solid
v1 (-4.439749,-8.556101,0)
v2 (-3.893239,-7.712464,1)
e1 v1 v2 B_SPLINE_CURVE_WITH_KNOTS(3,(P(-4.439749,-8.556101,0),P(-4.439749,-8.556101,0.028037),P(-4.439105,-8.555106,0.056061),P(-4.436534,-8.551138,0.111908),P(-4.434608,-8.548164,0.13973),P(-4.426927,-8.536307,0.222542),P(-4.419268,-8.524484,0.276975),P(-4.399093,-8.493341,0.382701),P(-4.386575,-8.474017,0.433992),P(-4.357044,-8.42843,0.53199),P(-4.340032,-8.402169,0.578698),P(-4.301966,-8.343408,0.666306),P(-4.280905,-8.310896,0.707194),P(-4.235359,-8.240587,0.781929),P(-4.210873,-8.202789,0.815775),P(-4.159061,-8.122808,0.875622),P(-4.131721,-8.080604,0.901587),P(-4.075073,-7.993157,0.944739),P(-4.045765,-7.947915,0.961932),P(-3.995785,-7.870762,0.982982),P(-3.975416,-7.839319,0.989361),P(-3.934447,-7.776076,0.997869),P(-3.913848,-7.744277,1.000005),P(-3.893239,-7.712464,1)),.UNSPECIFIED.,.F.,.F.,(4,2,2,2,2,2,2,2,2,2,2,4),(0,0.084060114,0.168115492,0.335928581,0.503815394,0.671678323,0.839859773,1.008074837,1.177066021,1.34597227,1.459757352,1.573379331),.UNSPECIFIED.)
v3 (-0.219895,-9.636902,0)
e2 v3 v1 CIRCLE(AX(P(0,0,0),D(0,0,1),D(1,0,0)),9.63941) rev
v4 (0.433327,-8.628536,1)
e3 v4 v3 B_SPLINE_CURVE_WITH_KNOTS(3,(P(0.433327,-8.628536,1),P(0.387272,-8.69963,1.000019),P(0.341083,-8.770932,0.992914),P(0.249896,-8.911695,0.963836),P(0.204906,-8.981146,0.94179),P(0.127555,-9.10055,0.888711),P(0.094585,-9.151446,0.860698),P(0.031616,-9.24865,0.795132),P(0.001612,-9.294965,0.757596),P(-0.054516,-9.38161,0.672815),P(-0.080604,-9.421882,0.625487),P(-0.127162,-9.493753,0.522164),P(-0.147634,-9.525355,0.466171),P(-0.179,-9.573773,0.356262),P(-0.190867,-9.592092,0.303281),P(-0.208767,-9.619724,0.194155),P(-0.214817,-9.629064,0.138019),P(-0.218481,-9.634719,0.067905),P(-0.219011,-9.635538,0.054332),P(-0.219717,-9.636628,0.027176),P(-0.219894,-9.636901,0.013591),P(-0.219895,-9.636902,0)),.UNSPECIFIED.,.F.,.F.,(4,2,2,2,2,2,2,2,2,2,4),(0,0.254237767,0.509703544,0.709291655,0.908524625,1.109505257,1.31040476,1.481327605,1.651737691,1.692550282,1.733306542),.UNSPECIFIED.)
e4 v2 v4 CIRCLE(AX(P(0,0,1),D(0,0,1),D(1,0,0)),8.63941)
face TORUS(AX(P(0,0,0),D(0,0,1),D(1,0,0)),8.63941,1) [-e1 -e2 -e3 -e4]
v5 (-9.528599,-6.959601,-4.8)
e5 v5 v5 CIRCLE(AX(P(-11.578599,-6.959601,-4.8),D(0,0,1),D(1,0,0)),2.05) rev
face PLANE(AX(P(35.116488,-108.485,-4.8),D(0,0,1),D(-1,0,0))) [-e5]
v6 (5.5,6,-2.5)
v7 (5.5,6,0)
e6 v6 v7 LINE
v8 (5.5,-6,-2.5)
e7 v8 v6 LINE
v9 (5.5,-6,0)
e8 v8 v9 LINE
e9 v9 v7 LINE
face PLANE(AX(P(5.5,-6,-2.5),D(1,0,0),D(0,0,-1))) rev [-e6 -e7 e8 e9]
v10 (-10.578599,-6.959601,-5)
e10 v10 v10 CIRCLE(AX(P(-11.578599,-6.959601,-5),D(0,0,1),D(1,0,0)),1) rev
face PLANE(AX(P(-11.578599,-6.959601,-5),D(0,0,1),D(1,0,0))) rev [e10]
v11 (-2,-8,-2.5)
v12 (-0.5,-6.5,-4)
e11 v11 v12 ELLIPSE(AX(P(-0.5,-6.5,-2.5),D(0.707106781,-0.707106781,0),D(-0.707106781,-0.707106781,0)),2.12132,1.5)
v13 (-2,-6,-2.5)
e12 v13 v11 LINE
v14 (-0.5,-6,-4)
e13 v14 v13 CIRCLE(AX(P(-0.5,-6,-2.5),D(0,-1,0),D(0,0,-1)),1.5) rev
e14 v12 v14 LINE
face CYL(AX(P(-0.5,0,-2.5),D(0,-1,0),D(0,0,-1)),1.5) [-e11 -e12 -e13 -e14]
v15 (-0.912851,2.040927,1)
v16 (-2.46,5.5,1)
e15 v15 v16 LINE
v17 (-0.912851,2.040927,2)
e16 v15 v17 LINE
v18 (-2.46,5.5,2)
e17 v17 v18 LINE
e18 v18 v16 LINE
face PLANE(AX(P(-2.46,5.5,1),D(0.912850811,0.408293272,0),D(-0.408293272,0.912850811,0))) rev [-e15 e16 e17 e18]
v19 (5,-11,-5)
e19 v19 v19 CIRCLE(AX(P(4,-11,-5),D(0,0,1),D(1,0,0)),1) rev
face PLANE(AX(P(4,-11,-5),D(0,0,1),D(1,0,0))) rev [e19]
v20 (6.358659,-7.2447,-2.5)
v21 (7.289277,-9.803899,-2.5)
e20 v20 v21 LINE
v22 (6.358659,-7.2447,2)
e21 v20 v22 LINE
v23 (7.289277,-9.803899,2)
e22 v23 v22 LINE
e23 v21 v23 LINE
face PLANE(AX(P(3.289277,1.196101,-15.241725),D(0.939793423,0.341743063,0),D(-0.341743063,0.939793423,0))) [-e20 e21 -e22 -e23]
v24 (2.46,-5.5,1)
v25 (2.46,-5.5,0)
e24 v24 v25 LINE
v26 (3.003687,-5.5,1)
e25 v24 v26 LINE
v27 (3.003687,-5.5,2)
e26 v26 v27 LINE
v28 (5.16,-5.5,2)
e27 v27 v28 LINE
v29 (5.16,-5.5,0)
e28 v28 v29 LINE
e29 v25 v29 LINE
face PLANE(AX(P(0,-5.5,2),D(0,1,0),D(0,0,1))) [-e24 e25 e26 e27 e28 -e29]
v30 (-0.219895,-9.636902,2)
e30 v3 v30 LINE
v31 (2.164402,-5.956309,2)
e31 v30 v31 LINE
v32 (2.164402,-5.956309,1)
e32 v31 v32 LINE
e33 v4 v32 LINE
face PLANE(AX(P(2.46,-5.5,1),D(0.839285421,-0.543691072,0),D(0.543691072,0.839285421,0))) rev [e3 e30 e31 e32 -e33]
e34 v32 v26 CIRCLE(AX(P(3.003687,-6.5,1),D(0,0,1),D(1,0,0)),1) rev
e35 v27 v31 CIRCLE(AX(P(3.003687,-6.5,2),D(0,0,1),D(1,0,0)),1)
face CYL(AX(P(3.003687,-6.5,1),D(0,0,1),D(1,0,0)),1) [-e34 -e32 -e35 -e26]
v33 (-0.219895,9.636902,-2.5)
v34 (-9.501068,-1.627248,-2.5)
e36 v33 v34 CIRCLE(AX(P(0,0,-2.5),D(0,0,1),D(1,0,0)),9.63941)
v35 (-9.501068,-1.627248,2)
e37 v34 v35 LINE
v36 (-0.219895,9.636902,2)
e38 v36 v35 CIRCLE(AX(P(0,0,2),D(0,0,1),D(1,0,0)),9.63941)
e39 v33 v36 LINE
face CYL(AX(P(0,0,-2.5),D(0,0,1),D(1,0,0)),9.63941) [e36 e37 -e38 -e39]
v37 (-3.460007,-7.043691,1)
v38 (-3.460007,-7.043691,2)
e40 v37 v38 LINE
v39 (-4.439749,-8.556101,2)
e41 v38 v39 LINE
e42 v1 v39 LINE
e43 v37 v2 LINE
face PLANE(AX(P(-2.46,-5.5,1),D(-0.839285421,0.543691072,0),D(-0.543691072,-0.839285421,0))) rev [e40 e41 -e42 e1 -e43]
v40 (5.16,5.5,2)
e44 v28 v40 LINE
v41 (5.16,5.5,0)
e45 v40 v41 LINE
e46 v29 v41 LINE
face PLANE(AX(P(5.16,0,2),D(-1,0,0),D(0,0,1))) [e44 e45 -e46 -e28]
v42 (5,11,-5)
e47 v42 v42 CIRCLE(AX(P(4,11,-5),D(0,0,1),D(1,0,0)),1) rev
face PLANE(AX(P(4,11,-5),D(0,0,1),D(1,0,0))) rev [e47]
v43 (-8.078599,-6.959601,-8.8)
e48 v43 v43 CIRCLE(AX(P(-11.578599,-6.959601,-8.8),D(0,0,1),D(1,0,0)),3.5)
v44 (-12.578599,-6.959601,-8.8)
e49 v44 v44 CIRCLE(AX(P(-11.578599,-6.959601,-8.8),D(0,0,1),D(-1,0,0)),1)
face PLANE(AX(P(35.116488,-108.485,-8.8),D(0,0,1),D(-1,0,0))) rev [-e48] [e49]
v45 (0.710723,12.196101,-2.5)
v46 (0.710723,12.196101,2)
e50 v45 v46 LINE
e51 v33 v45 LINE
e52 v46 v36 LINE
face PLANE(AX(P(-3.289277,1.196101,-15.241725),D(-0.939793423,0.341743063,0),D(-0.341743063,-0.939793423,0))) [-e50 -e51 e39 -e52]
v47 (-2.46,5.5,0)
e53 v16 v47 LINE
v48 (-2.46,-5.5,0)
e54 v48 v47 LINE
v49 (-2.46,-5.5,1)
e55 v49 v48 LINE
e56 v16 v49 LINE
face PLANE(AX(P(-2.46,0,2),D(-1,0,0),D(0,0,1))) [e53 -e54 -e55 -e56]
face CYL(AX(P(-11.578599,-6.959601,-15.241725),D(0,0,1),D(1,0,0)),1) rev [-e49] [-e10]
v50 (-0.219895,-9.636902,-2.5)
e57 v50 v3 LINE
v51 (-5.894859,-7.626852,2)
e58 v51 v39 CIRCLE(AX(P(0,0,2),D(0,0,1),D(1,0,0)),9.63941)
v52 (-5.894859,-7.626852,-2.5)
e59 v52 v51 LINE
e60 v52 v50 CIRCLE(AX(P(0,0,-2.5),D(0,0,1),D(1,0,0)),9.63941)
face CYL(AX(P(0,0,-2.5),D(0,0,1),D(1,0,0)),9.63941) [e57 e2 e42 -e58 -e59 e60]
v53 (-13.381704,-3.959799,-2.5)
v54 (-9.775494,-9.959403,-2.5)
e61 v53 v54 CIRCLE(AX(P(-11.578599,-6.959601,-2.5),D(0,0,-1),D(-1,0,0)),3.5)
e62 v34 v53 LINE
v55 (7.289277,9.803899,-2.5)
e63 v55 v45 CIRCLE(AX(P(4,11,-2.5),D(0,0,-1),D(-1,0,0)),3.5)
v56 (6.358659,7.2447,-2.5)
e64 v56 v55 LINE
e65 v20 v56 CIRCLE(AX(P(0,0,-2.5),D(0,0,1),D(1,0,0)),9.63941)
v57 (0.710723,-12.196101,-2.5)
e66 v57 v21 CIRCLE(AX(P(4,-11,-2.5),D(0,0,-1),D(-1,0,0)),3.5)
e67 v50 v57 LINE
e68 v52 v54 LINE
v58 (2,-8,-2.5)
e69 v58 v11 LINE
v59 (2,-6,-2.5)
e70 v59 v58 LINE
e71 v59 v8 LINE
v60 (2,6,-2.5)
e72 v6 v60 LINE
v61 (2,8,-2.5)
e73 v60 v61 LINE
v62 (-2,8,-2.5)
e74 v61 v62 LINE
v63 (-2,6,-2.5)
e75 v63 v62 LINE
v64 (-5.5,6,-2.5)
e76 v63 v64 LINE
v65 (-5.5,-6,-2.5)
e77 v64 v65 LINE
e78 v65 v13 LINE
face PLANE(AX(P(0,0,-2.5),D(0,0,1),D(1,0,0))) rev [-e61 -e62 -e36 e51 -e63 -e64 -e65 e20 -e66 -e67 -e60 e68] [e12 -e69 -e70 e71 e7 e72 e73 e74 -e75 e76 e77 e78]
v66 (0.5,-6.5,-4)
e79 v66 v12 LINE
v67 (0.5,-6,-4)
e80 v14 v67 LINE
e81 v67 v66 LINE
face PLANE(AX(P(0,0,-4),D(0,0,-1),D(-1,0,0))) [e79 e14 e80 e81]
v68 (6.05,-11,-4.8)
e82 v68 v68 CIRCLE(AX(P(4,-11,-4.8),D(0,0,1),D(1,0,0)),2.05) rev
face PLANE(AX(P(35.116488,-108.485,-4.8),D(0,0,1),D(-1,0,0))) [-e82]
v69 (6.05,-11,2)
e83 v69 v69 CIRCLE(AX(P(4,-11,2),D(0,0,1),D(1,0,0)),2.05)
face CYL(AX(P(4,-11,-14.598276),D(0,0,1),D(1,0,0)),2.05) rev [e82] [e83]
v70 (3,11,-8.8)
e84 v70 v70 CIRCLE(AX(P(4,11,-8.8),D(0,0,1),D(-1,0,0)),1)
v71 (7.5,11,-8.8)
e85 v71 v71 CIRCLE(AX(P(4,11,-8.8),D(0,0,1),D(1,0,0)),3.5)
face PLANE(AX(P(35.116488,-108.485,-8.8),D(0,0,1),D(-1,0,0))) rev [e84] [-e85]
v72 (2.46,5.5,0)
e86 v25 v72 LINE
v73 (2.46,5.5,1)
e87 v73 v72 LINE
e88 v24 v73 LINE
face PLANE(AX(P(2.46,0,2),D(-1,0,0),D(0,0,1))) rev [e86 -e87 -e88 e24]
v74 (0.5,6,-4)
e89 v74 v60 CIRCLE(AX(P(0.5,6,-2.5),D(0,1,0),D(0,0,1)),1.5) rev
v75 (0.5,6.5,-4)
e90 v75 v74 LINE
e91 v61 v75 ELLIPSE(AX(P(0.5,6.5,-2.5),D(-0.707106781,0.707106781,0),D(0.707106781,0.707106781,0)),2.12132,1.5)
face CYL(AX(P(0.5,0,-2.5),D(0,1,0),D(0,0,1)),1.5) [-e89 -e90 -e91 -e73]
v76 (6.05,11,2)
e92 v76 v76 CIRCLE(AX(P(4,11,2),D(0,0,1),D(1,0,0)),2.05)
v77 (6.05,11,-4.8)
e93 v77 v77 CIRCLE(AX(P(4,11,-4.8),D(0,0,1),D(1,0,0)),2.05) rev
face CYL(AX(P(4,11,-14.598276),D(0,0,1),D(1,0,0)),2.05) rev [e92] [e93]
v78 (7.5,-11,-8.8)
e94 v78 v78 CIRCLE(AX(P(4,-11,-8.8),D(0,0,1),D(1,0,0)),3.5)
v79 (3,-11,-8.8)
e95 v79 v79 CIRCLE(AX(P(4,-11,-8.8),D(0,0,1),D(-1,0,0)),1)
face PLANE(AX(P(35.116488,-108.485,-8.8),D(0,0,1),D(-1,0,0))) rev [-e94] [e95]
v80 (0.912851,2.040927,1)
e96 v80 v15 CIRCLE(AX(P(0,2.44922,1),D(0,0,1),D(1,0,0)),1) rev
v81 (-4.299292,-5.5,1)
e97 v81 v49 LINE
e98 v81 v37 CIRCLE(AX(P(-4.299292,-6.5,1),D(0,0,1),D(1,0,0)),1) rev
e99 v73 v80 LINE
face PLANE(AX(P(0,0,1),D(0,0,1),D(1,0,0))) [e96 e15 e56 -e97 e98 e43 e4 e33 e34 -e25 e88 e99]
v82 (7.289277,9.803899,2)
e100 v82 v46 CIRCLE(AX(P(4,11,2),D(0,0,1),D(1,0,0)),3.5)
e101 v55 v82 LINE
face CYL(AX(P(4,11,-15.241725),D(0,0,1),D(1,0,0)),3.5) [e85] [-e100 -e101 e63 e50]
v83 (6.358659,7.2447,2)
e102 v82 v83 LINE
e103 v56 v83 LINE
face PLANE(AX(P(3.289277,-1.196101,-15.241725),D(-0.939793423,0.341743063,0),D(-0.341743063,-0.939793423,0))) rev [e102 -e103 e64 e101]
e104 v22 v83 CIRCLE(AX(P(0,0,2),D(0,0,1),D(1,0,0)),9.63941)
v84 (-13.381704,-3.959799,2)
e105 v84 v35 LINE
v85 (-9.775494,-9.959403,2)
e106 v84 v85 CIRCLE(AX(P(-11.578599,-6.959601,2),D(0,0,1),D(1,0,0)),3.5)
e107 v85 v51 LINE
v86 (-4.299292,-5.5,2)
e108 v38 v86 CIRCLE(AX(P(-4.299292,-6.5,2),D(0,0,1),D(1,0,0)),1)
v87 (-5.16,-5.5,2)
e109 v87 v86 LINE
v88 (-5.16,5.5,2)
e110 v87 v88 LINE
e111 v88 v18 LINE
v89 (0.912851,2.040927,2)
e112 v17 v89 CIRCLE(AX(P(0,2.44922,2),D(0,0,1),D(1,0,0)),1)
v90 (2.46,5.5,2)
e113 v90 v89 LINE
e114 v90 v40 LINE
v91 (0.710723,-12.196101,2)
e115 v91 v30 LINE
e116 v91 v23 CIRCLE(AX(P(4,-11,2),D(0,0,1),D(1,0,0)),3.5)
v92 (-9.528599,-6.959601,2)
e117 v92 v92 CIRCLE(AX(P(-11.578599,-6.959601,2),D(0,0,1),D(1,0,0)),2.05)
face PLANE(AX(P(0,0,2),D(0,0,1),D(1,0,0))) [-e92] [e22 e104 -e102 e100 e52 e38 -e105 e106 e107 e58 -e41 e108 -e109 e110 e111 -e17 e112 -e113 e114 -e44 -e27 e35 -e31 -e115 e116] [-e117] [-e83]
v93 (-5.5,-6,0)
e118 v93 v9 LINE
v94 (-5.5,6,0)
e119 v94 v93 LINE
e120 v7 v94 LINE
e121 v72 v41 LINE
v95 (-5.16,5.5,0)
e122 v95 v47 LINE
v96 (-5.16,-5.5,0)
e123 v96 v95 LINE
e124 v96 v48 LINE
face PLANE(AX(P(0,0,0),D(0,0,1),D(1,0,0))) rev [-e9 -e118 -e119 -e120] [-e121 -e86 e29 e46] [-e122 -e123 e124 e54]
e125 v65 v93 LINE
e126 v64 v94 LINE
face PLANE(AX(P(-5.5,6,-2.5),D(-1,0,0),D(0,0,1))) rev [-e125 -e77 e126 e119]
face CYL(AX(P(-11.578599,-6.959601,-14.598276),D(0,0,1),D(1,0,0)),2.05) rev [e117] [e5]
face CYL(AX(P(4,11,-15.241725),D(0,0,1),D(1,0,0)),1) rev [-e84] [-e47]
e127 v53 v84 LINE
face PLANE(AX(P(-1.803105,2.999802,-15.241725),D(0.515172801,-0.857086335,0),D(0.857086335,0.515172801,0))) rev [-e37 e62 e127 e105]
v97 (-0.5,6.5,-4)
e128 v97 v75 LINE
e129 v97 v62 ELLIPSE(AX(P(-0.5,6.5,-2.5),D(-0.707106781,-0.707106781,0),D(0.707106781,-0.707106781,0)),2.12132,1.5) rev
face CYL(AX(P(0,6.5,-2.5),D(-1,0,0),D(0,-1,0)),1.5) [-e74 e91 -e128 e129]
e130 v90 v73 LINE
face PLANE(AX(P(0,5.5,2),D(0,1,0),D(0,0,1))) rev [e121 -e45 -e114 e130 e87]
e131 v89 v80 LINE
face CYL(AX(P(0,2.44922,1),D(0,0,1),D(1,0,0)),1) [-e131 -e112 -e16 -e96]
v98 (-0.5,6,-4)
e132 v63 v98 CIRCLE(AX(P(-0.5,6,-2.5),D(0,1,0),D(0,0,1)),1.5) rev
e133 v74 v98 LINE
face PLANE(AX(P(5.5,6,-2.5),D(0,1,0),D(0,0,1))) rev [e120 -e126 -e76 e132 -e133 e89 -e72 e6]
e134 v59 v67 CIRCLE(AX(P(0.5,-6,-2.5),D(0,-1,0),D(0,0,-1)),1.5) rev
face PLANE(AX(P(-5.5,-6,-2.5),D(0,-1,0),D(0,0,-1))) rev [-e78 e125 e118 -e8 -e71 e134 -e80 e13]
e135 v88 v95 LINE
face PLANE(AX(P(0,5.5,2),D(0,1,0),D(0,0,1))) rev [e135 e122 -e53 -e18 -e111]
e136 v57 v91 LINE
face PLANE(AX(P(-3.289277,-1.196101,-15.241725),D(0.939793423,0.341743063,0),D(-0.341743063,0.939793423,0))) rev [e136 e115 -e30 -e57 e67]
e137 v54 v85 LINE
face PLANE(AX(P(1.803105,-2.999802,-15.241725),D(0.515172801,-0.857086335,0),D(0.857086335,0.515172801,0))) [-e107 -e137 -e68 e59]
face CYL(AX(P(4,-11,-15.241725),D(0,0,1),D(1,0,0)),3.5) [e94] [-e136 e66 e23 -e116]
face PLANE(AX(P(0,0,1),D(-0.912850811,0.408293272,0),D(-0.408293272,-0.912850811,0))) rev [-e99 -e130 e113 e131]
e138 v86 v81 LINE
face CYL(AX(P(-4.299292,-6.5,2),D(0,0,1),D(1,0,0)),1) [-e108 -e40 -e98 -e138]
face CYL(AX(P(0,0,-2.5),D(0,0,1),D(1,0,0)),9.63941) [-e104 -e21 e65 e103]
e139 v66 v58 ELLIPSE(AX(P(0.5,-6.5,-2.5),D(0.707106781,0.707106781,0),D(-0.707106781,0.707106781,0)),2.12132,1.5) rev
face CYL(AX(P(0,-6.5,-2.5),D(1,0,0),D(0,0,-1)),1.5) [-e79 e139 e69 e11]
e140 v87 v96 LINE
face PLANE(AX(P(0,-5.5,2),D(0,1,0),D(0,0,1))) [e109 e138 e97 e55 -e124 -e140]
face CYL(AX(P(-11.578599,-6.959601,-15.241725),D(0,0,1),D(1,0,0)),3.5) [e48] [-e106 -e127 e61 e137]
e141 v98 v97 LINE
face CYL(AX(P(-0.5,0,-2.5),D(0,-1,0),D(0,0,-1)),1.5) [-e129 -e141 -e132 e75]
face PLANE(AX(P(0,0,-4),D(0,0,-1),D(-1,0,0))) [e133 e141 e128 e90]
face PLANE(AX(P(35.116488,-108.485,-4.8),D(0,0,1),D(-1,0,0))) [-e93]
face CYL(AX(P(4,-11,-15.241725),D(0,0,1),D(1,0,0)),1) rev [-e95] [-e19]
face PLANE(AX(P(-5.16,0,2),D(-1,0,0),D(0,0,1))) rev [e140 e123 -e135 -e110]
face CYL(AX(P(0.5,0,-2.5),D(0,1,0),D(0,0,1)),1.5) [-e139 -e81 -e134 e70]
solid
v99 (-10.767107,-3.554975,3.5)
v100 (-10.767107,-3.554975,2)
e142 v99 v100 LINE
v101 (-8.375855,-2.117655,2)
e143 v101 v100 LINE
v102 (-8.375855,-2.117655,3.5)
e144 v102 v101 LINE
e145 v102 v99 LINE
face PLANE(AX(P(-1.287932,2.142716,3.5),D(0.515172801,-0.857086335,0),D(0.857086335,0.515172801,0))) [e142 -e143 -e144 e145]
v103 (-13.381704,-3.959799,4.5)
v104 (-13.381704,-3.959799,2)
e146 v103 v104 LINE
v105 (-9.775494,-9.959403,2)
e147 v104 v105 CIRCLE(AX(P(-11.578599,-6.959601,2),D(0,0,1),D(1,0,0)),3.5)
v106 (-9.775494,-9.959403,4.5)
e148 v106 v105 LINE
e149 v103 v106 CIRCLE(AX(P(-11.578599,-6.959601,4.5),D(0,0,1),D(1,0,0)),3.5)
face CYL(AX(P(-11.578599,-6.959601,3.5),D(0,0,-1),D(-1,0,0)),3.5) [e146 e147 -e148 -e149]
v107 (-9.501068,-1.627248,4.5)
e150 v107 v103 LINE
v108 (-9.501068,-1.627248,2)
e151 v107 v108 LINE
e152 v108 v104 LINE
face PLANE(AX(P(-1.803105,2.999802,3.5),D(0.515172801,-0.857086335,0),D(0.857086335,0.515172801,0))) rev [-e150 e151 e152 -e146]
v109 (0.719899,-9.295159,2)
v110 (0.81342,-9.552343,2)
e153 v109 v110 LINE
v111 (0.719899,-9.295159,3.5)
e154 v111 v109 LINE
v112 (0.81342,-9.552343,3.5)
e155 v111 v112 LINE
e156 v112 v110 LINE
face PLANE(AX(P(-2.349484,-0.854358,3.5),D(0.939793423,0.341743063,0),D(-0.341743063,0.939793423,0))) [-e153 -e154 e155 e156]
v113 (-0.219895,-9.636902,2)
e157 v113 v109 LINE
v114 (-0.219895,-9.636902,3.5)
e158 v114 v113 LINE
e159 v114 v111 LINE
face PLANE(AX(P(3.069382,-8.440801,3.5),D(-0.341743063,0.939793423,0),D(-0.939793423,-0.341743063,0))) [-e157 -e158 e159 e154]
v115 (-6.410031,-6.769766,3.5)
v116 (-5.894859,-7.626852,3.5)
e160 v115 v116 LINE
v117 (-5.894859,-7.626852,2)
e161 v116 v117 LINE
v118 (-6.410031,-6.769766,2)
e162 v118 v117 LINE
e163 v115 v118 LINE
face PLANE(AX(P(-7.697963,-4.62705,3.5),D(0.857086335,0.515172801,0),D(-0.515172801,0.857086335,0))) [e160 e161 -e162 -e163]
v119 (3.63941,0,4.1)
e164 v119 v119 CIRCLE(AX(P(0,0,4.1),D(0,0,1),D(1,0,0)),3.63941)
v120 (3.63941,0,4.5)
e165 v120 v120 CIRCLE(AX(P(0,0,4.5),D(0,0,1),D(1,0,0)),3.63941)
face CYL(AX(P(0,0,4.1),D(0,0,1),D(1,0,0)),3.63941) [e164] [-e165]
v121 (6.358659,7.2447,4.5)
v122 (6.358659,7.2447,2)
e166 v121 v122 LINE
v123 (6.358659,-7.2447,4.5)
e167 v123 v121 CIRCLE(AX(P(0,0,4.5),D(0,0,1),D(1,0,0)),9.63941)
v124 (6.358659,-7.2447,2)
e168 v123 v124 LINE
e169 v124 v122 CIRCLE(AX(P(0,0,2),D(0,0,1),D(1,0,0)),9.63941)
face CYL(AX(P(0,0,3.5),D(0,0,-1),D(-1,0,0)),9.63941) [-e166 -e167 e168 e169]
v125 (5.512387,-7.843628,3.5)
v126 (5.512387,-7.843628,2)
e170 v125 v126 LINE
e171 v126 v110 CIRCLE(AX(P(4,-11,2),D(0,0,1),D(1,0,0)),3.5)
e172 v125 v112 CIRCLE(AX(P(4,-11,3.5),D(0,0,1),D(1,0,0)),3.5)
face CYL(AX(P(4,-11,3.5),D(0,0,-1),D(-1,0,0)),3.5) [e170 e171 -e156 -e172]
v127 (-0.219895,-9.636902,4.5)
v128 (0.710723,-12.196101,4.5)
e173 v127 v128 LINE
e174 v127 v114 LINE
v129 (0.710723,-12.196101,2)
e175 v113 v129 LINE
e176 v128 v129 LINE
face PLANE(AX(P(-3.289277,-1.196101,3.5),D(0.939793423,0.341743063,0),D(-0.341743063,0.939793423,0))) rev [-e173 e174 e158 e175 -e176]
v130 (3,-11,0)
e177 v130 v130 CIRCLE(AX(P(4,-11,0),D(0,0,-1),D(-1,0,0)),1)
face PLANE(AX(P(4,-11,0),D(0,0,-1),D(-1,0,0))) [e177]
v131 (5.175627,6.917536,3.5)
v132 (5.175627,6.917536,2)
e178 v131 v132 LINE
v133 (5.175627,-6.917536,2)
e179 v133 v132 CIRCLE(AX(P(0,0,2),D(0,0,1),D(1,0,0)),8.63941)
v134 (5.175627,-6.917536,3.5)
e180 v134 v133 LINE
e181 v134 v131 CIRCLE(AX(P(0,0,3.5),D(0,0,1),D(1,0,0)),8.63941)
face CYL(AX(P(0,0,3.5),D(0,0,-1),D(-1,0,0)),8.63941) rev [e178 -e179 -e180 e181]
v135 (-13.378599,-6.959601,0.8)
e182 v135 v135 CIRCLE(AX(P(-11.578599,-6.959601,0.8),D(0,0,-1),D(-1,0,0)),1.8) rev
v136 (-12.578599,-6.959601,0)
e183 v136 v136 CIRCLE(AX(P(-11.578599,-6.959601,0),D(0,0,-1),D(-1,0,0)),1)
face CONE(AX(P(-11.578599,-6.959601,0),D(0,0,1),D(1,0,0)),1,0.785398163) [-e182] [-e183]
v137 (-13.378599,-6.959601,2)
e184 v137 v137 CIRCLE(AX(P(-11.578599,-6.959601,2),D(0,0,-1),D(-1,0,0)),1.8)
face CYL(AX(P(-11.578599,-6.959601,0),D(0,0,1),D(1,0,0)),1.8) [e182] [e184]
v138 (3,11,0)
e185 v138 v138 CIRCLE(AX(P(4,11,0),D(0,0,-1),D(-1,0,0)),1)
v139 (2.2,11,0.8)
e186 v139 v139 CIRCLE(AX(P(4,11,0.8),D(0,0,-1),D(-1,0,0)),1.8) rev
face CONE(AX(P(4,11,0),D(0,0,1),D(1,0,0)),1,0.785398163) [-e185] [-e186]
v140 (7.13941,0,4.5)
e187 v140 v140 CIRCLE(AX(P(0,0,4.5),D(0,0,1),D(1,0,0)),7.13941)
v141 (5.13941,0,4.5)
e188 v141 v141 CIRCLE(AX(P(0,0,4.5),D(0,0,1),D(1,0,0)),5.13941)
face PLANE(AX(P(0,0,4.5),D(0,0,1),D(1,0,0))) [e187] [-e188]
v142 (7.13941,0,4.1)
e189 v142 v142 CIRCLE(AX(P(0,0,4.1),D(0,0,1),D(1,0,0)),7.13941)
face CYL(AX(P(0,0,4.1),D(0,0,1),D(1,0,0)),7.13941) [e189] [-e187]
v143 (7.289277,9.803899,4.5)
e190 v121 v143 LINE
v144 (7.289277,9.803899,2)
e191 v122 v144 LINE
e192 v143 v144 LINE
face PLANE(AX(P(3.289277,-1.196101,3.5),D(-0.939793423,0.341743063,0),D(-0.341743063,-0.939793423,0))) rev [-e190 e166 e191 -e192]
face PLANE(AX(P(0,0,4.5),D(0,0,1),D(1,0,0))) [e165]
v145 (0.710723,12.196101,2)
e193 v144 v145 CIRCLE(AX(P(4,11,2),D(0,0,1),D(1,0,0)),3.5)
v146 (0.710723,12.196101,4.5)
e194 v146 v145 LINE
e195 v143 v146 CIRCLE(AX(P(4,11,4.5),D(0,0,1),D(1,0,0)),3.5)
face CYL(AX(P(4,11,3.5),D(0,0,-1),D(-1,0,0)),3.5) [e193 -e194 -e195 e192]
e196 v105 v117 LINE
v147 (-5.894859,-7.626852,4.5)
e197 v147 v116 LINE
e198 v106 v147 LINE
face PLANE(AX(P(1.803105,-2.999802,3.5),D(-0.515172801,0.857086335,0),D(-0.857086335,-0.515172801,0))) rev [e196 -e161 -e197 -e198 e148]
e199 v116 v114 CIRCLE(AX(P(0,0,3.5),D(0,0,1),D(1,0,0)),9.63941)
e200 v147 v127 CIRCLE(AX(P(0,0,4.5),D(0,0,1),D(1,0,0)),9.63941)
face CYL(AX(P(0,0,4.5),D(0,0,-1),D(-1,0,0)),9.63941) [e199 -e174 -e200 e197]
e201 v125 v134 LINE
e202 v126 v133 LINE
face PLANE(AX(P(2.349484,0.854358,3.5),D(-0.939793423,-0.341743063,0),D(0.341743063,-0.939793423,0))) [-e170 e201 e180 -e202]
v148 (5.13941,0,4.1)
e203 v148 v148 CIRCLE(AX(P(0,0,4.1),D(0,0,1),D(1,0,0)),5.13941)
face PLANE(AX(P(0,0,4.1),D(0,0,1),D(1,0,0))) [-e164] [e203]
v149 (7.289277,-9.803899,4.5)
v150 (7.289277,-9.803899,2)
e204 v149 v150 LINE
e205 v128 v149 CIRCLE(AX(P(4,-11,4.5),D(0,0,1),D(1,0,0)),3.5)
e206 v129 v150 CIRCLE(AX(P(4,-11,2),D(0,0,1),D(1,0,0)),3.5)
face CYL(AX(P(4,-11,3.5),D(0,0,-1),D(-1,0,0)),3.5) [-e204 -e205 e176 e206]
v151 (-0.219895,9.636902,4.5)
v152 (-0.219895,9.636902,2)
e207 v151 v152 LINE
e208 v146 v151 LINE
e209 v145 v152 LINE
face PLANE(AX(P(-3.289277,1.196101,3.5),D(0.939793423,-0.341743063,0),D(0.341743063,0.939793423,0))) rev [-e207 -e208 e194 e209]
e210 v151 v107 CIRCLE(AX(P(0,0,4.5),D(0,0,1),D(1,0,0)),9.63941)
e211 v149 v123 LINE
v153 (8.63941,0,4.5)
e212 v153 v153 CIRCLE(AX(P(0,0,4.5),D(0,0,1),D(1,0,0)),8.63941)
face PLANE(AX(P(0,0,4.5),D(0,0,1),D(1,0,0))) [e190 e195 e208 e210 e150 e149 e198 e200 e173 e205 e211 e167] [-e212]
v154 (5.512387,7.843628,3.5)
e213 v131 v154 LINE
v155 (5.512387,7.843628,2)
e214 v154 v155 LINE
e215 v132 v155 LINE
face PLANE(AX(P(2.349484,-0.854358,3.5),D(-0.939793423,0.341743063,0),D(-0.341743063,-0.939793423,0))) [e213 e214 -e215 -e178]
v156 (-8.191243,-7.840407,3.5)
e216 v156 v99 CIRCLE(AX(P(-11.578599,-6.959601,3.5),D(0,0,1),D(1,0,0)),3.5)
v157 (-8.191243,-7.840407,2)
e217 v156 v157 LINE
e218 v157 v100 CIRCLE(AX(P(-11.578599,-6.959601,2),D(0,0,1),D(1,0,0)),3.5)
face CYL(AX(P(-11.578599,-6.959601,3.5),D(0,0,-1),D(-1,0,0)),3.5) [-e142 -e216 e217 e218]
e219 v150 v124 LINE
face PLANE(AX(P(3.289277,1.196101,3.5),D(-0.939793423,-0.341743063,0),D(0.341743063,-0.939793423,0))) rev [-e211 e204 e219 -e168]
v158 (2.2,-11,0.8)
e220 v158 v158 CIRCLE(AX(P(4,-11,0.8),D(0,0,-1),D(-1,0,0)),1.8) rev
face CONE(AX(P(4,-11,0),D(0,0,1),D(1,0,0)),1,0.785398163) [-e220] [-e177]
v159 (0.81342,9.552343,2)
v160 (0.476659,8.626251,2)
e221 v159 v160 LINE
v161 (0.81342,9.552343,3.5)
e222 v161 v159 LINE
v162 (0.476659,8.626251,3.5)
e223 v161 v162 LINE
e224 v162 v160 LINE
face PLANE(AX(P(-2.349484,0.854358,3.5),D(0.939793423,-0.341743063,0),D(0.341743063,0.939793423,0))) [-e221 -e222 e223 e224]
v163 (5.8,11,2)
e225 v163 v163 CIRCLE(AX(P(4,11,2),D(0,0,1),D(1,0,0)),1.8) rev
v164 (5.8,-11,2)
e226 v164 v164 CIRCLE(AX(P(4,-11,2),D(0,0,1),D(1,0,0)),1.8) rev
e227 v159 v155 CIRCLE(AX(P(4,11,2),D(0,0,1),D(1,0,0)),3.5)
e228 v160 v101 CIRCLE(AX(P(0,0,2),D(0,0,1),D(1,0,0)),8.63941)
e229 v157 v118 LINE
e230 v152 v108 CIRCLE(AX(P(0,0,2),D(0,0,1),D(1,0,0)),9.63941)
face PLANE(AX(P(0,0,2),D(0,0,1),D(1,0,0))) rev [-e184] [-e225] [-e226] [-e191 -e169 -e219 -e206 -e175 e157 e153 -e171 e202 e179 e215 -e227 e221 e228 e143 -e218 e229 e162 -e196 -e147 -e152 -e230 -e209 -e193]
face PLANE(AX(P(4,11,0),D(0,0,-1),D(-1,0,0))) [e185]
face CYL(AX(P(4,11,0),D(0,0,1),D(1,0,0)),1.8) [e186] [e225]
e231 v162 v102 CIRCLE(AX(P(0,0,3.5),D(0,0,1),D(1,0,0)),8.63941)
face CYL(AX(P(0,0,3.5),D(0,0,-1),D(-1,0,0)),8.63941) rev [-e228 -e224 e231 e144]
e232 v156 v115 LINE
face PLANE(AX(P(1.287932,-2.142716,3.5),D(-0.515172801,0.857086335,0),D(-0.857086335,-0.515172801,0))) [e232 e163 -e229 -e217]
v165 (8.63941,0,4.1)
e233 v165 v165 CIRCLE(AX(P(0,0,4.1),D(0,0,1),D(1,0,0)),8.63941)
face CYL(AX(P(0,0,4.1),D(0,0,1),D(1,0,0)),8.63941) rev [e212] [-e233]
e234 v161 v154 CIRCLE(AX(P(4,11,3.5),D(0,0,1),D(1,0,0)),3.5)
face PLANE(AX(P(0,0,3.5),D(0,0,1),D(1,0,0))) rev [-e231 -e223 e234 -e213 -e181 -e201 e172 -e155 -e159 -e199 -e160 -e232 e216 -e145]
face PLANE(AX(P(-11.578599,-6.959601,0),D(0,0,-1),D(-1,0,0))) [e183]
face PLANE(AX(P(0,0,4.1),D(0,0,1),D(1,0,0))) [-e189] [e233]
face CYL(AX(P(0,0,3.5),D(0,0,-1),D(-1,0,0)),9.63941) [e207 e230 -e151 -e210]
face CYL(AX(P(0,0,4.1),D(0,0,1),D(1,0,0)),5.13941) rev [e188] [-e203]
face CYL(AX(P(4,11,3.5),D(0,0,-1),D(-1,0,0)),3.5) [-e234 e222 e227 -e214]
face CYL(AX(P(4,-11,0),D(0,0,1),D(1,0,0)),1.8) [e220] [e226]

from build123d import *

# Parameters (mm, degrees)
SKETCH1_R             = 9.639410298
SKETCH1_W             = 11
SKETCH1_H             = 12
BOSS_EXTRUDE1_DEPTH   = 2.5
BOSS_EXTRUDE2_START   = 2
SKETCH2_R             = 9.639410298
SKETCH2_W             = 11
SKETCH2_H             = 12
SKETCH2_W_2           = 2.7
SKETCH2_H_2           = 11
BOSS_EXTRUDE2_DEPTH   = 2
SKETCH3_R             = 1
BOSS_EXTRUDE3_DEPTH   = 4.5
SKETCH4_R             = 1
BOSS_EXTRUDE4_DEPTH   = 6.3
SKETCH5_W             = 4
SKETCH5_H             = 2
BOSS_EXTRUDE5_DEPTH   = 1.5
FILLET1_R             = 1.5
SKETCH6_R             = 2.05
CUT_EXTRUDE1_DEPTH    = 6.8
SKETCH7_R             = 1
BOSS_EXTRUDE6_DEPTH   = 0.2
CUT_EXTRUDE2_DEPTH    = 1
FILLET2_R             = 1
FILLET3_R             = 1
SKETCH9_R             = 2.05
BOSS_EXTRUDE7_DEPTH   = 1.5
BOSS_EXTRUDE8_START   = 1
BOSS_EXTRUDE8_DEPTH   = 1
SKETCH11_R            = 1.8
BOSS_EXTRUDE9_DEPTH   = 2
BOSS_EXTRUDE9_2_DEPTH = 2
BOSS_EXTRUDE9_3_DEPTH = 2
CHAMFER1_SIZE         = 0.8
SKETCH12_R            = 8.639410298
SKETCH12_R_2          = 7.139410298
SKETCH12_R_3          = 5.139410298
SKETCH12_R_4          = 3.639410298
CUT_EXTRUDE3_DEPTH    = 0.4


with BuildPart() as part:
    # Sketch1 → Boss-Extrude1 (new body)
    with BuildSketch(Plane.XY):
        Circle(SKETCH1_R)
        Rectangle(SKETCH1_W, SKETCH1_H, mode=Mode.SUBTRACT)
    extrude(amount=-BOSS_EXTRUDE1_DEPTH)

    # Sketch2 → Boss-Extrude2 (add)
    # profile 1 of 2: a face of its own
    with BuildSketch(Plane.XY.offset(BOSS_EXTRUDE2_START)):
        Circle(SKETCH2_R)
        Rectangle(SKETCH2_W, SKETCH2_H, mode=Mode.SUBTRACT)
    # profile 2 of 2: a face of its own
    with BuildSketch(Plane.XY.offset(BOSS_EXTRUDE2_START)):
        Rectangle(SKETCH2_W, SKETCH2_H)
        with Locations((3.81, 0)):
            Rectangle(SKETCH2_W_2, SKETCH2_H_2, mode=Mode.SUBTRACT)
        with Locations((-3.81, 0)):
            Rectangle(SKETCH2_W_2, SKETCH2_H_2, mode=Mode.SUBTRACT)
    extrude(amount=-BOSS_EXTRUDE2_DEPTH)

    # Sketch3 → Boss-Extrude3 (add)
    # profile 1 of 3: a face of its own
    with BuildSketch(Plane.XY.offset(2)):
        with BuildLine():
            Line((-9.501068119, -1.627247829), (-13.381703586, -3.959799129))
            ThreePointArc((-13.381703586, -3.959799129), (-14.578400953, -8.762706104), (-9.775493977, -9.959403471))
            Line((-9.775493977, -9.959403471), (-5.89485851, -7.626852171))
            ThreePointArc((-5.89485851, -7.626852171), (-8.26180684, -4.965962005), (-9.501068119, -1.627247829))
        make_face()
        with Locations((-11.578598782, -6.9596013)):
            Circle(SKETCH3_R, mode=Mode.SUBTRACT)
    # profile 2 of 3: a face of its own
    with BuildSketch(Plane.XY.offset(2)):
        with BuildLine():
            Line((0.710723018, 12.196100721), (-0.219894755, 9.636901846))
            ThreePointArc((-0.219894755, 9.636901846), (3.294201602, 9.059054404), (6.35865921, 7.244700404))
            Line((6.35865921, 7.244700404), (7.289276982, 9.803899279))
            ThreePointArc((7.289276982, 9.803899279), (5.196100721, 14.289276982), (0.710723018, 12.196100721))
        make_face()
        with Locations((4, 11)):
            Circle(SKETCH3_R, mode=Mode.SUBTRACT)
    # profile 3 of 3: a face of its own
    with BuildSketch(Plane.XY.offset(2)):
        with BuildLine():
            Line((-0.219894755, -9.636901846), (0.710723018, -12.196100721))
            ThreePointArc((0.710723018, -12.196100721), (5.196100721, -14.289276982), (7.289276982, -9.803899279))
            Line((7.289276982, -9.803899279), (6.35865921, -7.244700404))
            ThreePointArc((6.35865921, -7.244700404), (3.294201602, -9.059054404), (-0.219894755, -9.636901846))
        make_face()
        with Locations((4, -11)):
            Circle(SKETCH3_R, mode=Mode.SUBTRACT)
    extrude(amount=-BOSS_EXTRUDE3_DEPTH)

    # Sketch4 → Boss-Extrude4 (add)
    # profile 1 of 3: a face of its own
    with BuildSketch(Plane(origin=(0, 0, -2.5), x_dir=(-1, 0, 0), z_dir=(0, 0, -1))):
        with BuildLine():
            ThreePointArc((13.381703586, -3.959799129), (8.578796611, -5.156496496), (9.775493977, -9.959403471))
            ThreePointArc((9.775493977, -9.959403471), (13.301841827, -10.005981678), (15.078598782, -6.9596013))
            ThreePointArc((15.078598782, -6.9596013), (14.62497916, -5.236358255), (13.381703586, -3.959799129))
        make_face()
        with Locations(Location((11.578598782, -6.9596013, 0), (0, 0, 180))):
            Circle(SKETCH4_R, mode=Mode.SUBTRACT)
    # profile 2 of 3: a face of its own
    with BuildSketch(Plane(origin=(0, 0, -2.5), x_dir=(-1, 0, 0), z_dir=(0, 0, -1))):
        with BuildLine():
            ThreePointArc((-7.289276982, -9.803899279), (-5.196100721, -14.289276982), (-0.710723018, -12.196100721))
            ThreePointArc((-0.710723018, -12.196100721), (-0.553083303, -11.607260472), (-0.5, -11))
            ThreePointArc((-0.5, -11), (-3.392739528, -7.553083303), (-7.289276982, -9.803899279))
        make_face()
        with Locations(Location((-4, -11, 0), (0, 0, 180))):
            Circle(SKETCH4_R, mode=Mode.SUBTRACT)
    # profile 3 of 3: a face of its own
    with BuildSketch(Plane(origin=(0, 0, -2.5), x_dir=(-1, 0, 0), z_dir=(0, 0, -1))):
        with BuildLine():
            ThreePointArc((-0.5, 11), (-0.553083303, 11.607260472), (-0.710723018, 12.196100721))
            ThreePointArc((-0.710723018, 12.196100721), (-5.196100721, 14.289276982), (-7.289276982, 9.803899279))
            ThreePointArc((-7.289276982, 9.803899279), (-3.392739528, 7.553083303), (-0.5, 11))
        make_face()
        with Locations(Location((-4, 11, 0), (0, 0, 180))):
            Circle(SKETCH4_R, mode=Mode.SUBTRACT)
    extrude(amount=BOSS_EXTRUDE4_DEPTH)

    # Sketch5 → Boss-Extrude5 (add)
    with BuildSketch(Plane(origin=(0, 0, -2.5), x_dir=(-1, 0, 0), z_dir=(0, 0, -1))):
        with Locations((0, -7)):
            Rectangle(SKETCH5_W, SKETCH5_H)
        with Locations((0, 7)):
            Rectangle(SKETCH5_W, SKETCH5_H)
    extrude(amount=BOSS_EXTRUDE5_DEPTH)

    # Fillet1
    fillet1_edges = [part.edges().sort_by_distance(p)[0] for p in [
        (0, 8, -4),
        (0, -8, -4),
        (2, -7, -4),
        (-2, -7, -4),
        (-2, 7, -4),
        (2, 7, -4),
    ]]
    fillet(fillet1_edges, radius=FILLET1_R - 0.0001)  # a hair under: the kernel refuses the full size

    # Sketch6 → Cut-Extrude1 (cut)
    with BuildSketch(Plane.XY.offset(2)):
        with Locations((4, 11)):
            Circle(SKETCH6_R)
        with Locations((-11.578598782, -6.9596013)):
            Circle(SKETCH6_R)
        with Locations((4, -11)):
            Circle(SKETCH6_R)
    extrude(amount=-CUT_EXTRUDE1_DEPTH, mode=Mode.SUBTRACT)

    # Sketch7 → Boss-Extrude6 (add)
    with BuildSketch(Plane.XY.offset(-4.8)):
        with Locations((-11.578598782, -6.9596013)):
            Circle(SKETCH7_R)
        with Locations((4, 11)):
            Circle(SKETCH7_R)
        with Locations((4, -11)):
            Circle(SKETCH7_R)
    extrude(amount=-BOSS_EXTRUDE6_DEPTH)

    # Sketch8 → Cut-Extrude2 (cut)
    with BuildSketch(Plane.XY.offset(2)):
        with BuildLine():
            Line((-2.46, 5.5), (0, 0))
            Line((0, 0), (2.46, 5.5))
            Line((2.46, 5.5), (2.46, -5.5))
            Line((2.46, -5.5), (-0.219894755, -9.636901846))
            ThreePointArc((-0.219894755, -9.636901846), (-2.391673729, -9.337993771), (-4.439749185, -8.556100634))
            Line((-4.439749185, -8.556100634), (-2.46, -5.5))
            Line((-2.46, -5.5), (-2.46, 5.5))
        make_face()
    extrude(amount=-CUT_EXTRUDE2_DEPTH, mode=Mode.SUBTRACT)

    # Fillet2
    fillet2_edges = [part.edges().sort_by_distance(p)[0] for p in [
        (0, 0, 1.5),
        (-2.46, -5.5, 1.5),
        (2.46, -5.5, 1.5),
    ]]
    fillet(fillet2_edges, radius=FILLET2_R)

    # Fillet3
    fillet3_edges = [part.edges().sort_by_distance(p)[0] for p in [
        (-2.391673729, -9.337993771, 1),
    ]]
    fillet(fillet3_edges, radius=FILLET3_R)


with BuildPart() as body_2:
    # Sketch9 → Boss-Extrude7 (new body)
    # profile 1 of 13: a face of its own
    with BuildSketch(Plane.XY.offset(2)):
        with BuildLine():
            ThreePointArc((0.813420314, 9.552343307), (2.803899279, 7.710723018), (5.512387431, 7.843627991))
            Line((5.512387431, 7.843627991), (6.349483559, 10.145642342))
            ThreePointArc((6.349483559, 10.145642342), (4.854357658, 13.349483559), (1.650516441, 11.854357658))
            Line((1.650516441, 11.854357658), (0.813420314, 9.552343307))
        make_face()
        with Locations((4, 11)):
            Circle(SKETCH9_R, mode=Mode.SUBTRACT)
    # profile 2 of 13: a face of its own
    with BuildSketch(Plane.XY.offset(2)):
        with BuildLine():
            Line((6.349483559, 10.145642342), (5.512387431, 7.843627991))
            ThreePointArc((5.512387431, 7.843627991), (6.593195165, 8.64939607), (7.289276982, 9.803899279))
            ThreePointArc((7.289276982, 9.803899279), (7.446916697, 10.392739528), (7.5, 11))
            ThreePointArc((7.5, 11), (4.607260472, 14.446916697), (0.710723018, 12.196100721))
            ThreePointArc((0.710723018, 12.196100721), (0.502637678, 10.864144248), (0.813420314, 9.552343307))
            Line((0.813420314, 9.552343307), (1.650516441, 11.854357658))
            ThreePointArc((1.650516441, 11.854357658), (4.854357658, 13.349483559), (6.349483559, 10.145642342))
        make_face()
    # profile 3 of 13: a face of its own
    with BuildSketch(Plane.XY.offset(2)):
        with BuildLine():
            Line((-12.866530785, -4.816885464), (-10.767106599, -3.554974971))
            ThreePointArc((-10.767106599, -3.554974971), (-12.114130805, -3.500814598), (-13.381703586, -3.959799129))
            ThreePointArc((-13.381703586, -3.959799129), (-14.578400953, -8.762706104), (-9.775493977, -9.959403471))
            ThreePointArc((-9.775493977, -9.959403471), (-8.775429465, -9.055368888), (-8.191242593, -7.840406644))
            Line((-8.191242593, -7.840406644), (-10.290666779, -9.102317136))
            ThreePointArc((-10.290666779, -9.102317136), (-13.721314618, -8.247533303), (-12.866530785, -4.816885464))
        make_face()
    # profile 4 of 13: a face of its own
    with BuildSketch(Plane.XY.offset(2)):
        with BuildLine():
            ThreePointArc((-8.078598782, -6.9596013), (-8.831762179, -4.790525764), (-10.767106599, -3.554974971))
            Line((-10.767106599, -3.554974971), (-12.866530785, -4.816885464))
            ThreePointArc((-12.866530785, -4.816885464), (-13.721314618, -8.247533303), (-10.290666779, -9.102317136))
            Line((-10.290666779, -9.102317136), (-8.191242593, -7.840406644))
            ThreePointArc((-8.191242593, -7.840406644), (-8.106873947, -7.403590794), (-8.078598782, -6.9596013))
        make_face()
        with Locations((-11.578598782, -6.9596013)):
            Circle(SKETCH9_R, mode=Mode.SUBTRACT)
    # profile 5 of 13: a face of its own
    with BuildSketch(Plane.XY.offset(2)):
        with BuildLine():
            Line((0.476659469, 8.626250985), (0.813420314, 9.552343307))
            ThreePointArc((0.813420314, 9.552343307), (0.502637678, 10.864144248), (0.710723018, 12.196100721))
            Line((0.710723018, 12.196100721), (-0.219894755, 9.636901846))
            ThreePointArc((-0.219894755, 9.636901846), (-7.439391559, 6.129737688), (-9.501068119, -1.627247829))
            Line((-9.501068119, -1.627247829), (-13.381703586, -3.959799129))
            ThreePointArc((-13.381703586, -3.959799129), (-12.114130805, -3.500814598), (-10.767106599, -3.554974971))
            Line((-10.767106599, -3.554974971), (-8.375855155, -2.117654534))
            ThreePointArc((-8.375855155, -2.117654534), (-6.667623232, 5.493833883), (0.476659469, 8.626250985))
        make_face()
    # profile 6 of 13: a face of its own
    with BuildSketch(Plane.XY.offset(2)):
        with BuildLine():
            Line((-6.410031312, -6.769765836), (-8.191242593, -7.840406644))
            ThreePointArc((-8.191242593, -7.840406644), (-8.775429465, -9.055368888), (-9.775493977, -9.959403471))
            Line((-9.775493977, -9.959403471), (-5.89485851, -7.626852171))
            Line((-5.89485851, -7.626852171), (-6.410031312, -6.769765836))
        make_face()
    # profile 7 of 13: a face of its own
    with BuildSketch(Plane.XY.offset(2)):
        with BuildLine():
            Line((0.813420314, -9.552343307), (0.719898669, -9.295158783))
            Line((0.719898669, -9.295158783), (-0.219894755, -9.636901846))
            Line((-0.219894755, -9.636901846), (0.710723018, -12.196100721))
            ThreePointArc((0.710723018, -12.196100721), (0.502637678, -10.864144248), (0.813420314, -9.552343307))
        make_face()
    # profile 8 of 13: a face of its own
    with BuildSketch(Plane.XY.offset(2)):
        with BuildLine():
            Line((1.650516441, -11.854357658), (0.813420314, -9.552343307))
            ThreePointArc((0.813420314, -9.552343307), (0.502637678, -10.864144248), (0.710723018, -12.196100721))
            ThreePointArc((0.710723018, -12.196100721), (4.607260472, -14.446916697), (7.5, -11))
            ThreePointArc((7.5, -11), (7.446916697, -10.392739528), (7.289276982, -9.803899279))
            ThreePointArc((7.289276982, -9.803899279), (6.593195165, -8.64939607), (5.512387431, -7.843627991))
            Line((5.512387431, -7.843627991), (6.349483559, -10.145642342))
            ThreePointArc((6.349483559, -10.145642342), (4.854357658, -13.349483559), (1.650516441, -11.854357658))
        make_face()
    # profile 9 of 13: a face of its own
    with BuildSketch(Plane.XY.offset(2)):
        with BuildLine():
            ThreePointArc((5.512387431, -7.843627991), (2.803899279, -7.710723018), (0.813420314, -9.552343307))
            Line((0.813420314, -9.552343307), (1.650516441, -11.854357658))
            ThreePointArc((1.650516441, -11.854357658), (4.854357658, -13.349483559), (6.349483559, -10.145642342))
            Line((6.349483559, -10.145642342), (5.512387431, -7.843627991))
        make_face()
        with Locations((4, -11)):
            Circle(SKETCH9_R, mode=Mode.SUBTRACT)
    # profile 10 of 13: a face of its own
    with BuildSketch(Plane.XY.offset(2)):
        with BuildLine():
            Line((5.175626587, -6.917535669), (5.512387431, -7.843627991))
            ThreePointArc((5.512387431, -7.843627991), (6.593195165, -8.64939607), (7.289276982, -9.803899279))
            Line((7.289276982, -9.803899279), (6.35865921, -7.244700404))
            ThreePointArc((6.35865921, -7.244700404), (9.639410298, 0), (6.35865921, 7.244700404))
            Line((6.35865921, 7.244700404), (7.289276982, 9.803899279))
            ThreePointArc((7.289276982, 9.803899279), (6.593195165, 8.64939607), (5.512387431, 7.843627991))
            Line((5.512387431, 7.843627991), (5.175626587, 6.917535669))
            ThreePointArc((5.175626587, 6.917535669), (8.639410298, 0), (5.175626587, -6.917535669))
        make_face()
    # profile 11 of 13: a face of its own
    with BuildSketch(Plane.XY.offset(2)):
        with Locations((-11.578598782, -6.9596013)):
            Circle(SKETCH9_R)
    # profile 12 of 13: a face of its own
    with BuildSketch(Plane.XY.offset(2)):
        with Locations((4, 11)):
            Circle(SKETCH9_R)
    # profile 13 of 13: a face of its own
    with BuildSketch(Plane.XY.offset(2)):
        with Locations((4, -11)):
            Circle(SKETCH9_R)
    extrude(amount=BOSS_EXTRUDE7_DEPTH)

    # Sketch10 → Boss-Extrude8 (add)
    with BuildSketch(Plane.XY.offset(3.5).offset(BOSS_EXTRUDE8_START)):
        with BuildLine():
            ThreePointArc((-5.89485851, -7.626852171), (-3.218326708, -9.086286596), (-0.219894755, -9.636901846))
            Line((-0.219894755, -9.636901846), (0.719898669, -9.295158783))
            Line((0.719898669, -9.295158783), (0.813420314, -9.552343307))
            ThreePointArc((0.813420314, -9.552343307), (2.803899279, -7.710723018), (5.512387431, -7.843627991))
            Line((5.512387431, -7.843627991), (5.175626587, -6.917535669))
            ThreePointArc((5.175626587, -6.917535669), (8.639410298, 0), (5.175626587, 6.917535669))
            Line((5.175626587, 6.917535669), (5.512387431, 7.843627991))
            ThreePointArc((5.512387431, 7.843627991), (2.803899279, 7.710723018), (0.813420314, 9.552343307))
            Line((0.813420314, 9.552343307), (0.476659469, 8.626250985))
            ThreePointArc((0.476659469, 8.626250985), (-6.667623232, 5.493833883), (-8.375855155, -2.117654534))
            Line((-8.375855155, -2.117654534), (-10.767106599, -3.554974971))
            ThreePointArc((-10.767106599, -3.554974971), (-8.578796611, -5.156496496), (-8.191242593, -7.840406644))
            Line((-8.191242593, -7.840406644), (-6.410031312, -6.769765836))
            Line((-6.410031312, -6.769765836), (-5.89485851, -7.626852171))
        make_face()
        with BuildLine():
            Line((-9.501068119, -1.627247829), (-13.381703586, -3.959799129))
            ThreePointArc((-13.381703586, -3.959799129), (-14.578400953, -8.762706104), (-9.775493977, -9.959403471))
            Line((-9.775493977, -9.959403471), (-5.89485851, -7.626852171))
            Line((-5.89485851, -7.626852171), (-6.410031312, -6.769765836))
            Line((-6.410031312, -6.769765836), (-8.191242593, -7.840406644))
            ThreePointArc((-8.191242593, -7.840406644), (-8.578796611, -5.156496496), (-10.767106599, -3.554974971))
            Line((-10.767106599, -3.554974971), (-8.375855155, -2.117654534))
            ThreePointArc((-8.375855155, -2.117654534), (-6.667623232, 5.493833883), (0.476659469, 8.626250985))
            Line((0.476659469, 8.626250985), (0.813420314, 9.552343307))
            ThreePointArc((0.813420314, 9.552343307), (2.803899279, 7.710723018), (5.512387431, 7.843627991))
            Line((5.512387431, 7.843627991), (5.175626587, 6.917535669))
            ThreePointArc((5.175626587, 6.917535669), (8.639410298, 0), (5.175626587, -6.917535669))
            Line((5.175626587, -6.917535669), (5.512387431, -7.843627991))
            ThreePointArc((5.512387431, -7.843627991), (2.803899279, -7.710723018), (0.813420314, -9.552343307))
            Line((0.813420314, -9.552343307), (0.719898669, -9.295158783))
            Line((0.719898669, -9.295158783), (-0.219894755, -9.636901846))
            Line((-0.219894755, -9.636901846), (0.710723018, -12.196100721))
            ThreePointArc((0.710723018, -12.196100721), (5.196100721, -14.289276982), (7.289276982, -9.803899279))
            Line((7.289276982, -9.803899279), (6.35865921, -7.244700404))
            ThreePointArc((6.35865921, -7.244700404), (9.639410298, 0), (6.35865921, 7.244700404))
            Line((6.35865921, 7.244700404), (7.289276982, 9.803899279))
            ThreePointArc((7.289276982, 9.803899279), (5.196100721, 14.289276982), (0.710723018, 12.196100721))
            Line((0.710723018, 12.196100721), (-0.219894755, 9.636901846))
            ThreePointArc((-0.219894755, 9.636901846), (-7.439391559, 6.129737688), (-9.501068119, -1.627247829))
        make_face()
    extrude(amount=-BOSS_EXTRUDE8_DEPTH)


with BuildPart() as body_3:
    # Sketch11 → Boss-Extrude9 (new body)
    with BuildSketch(Plane(origin=(0, 0, 2), x_dir=(-1, 0, 0), z_dir=(0, 0, -1))):
        with Locations((-4, 11)):
            Circle(SKETCH11_R)
    extrude(amount=BOSS_EXTRUDE9_DEPTH)


with BuildPart() as body_4:
    # Sketch11 → Boss-Extrude9 2 (new body)
    with BuildSketch(Plane(origin=(0, 0, 2), x_dir=(-1, 0, 0), z_dir=(0, 0, -1))):
        with Locations((11.578598782, -6.9596013)):
            Circle(SKETCH11_R)
    extrude(amount=BOSS_EXTRUDE9_2_DEPTH)


with BuildPart() as body_5:
    # Sketch11 → Boss-Extrude9 3 (new body)
    with BuildSketch(Plane(origin=(0, 0, 2), x_dir=(-1, 0, 0), z_dir=(0, 0, -1))):
        with Locations((-4, -11)):
            Circle(SKETCH11_R)
    extrude(amount=BOSS_EXTRUDE9_3_DEPTH)


with BuildPart() as body_2_1:
    add(body_2.part)

    # Combine1: union body 4, body 3, body 5
    add(body_4.part)
    add(body_3.part)
    add(body_5.part)

    # Chamfer1
    chamfer1_edges = [body_2_1.edges().sort_by_distance(p)[0] for p in [
        (-9.778598782, -6.9596013, 0),
        (5.8, 11, 0),
        (5.8, -11, 0),
    ]]
    chamfer(chamfer1_edges, length=CHAMFER1_SIZE)

    # Sketch12 → Cut-Extrude3 (cut)
    # profile 1 of 2: a face of its own
    with BuildSketch(Plane.XY.offset(4.5)):
        Circle(SKETCH12_R)
        Circle(SKETCH12_R_2, mode=Mode.SUBTRACT)
    # profile 2 of 2: a face of its own
    with BuildSketch(Plane.XY.offset(4.5)):
        Circle(SKETCH12_R_3)
        Circle(SKETCH12_R_4, mode=Mode.SUBTRACT)
    extrude(amount=-CUT_EXTRUDE3_DEPTH, mode=Mode.SUBTRACT)


solid = Compound([part.part, body_2_1.part])
